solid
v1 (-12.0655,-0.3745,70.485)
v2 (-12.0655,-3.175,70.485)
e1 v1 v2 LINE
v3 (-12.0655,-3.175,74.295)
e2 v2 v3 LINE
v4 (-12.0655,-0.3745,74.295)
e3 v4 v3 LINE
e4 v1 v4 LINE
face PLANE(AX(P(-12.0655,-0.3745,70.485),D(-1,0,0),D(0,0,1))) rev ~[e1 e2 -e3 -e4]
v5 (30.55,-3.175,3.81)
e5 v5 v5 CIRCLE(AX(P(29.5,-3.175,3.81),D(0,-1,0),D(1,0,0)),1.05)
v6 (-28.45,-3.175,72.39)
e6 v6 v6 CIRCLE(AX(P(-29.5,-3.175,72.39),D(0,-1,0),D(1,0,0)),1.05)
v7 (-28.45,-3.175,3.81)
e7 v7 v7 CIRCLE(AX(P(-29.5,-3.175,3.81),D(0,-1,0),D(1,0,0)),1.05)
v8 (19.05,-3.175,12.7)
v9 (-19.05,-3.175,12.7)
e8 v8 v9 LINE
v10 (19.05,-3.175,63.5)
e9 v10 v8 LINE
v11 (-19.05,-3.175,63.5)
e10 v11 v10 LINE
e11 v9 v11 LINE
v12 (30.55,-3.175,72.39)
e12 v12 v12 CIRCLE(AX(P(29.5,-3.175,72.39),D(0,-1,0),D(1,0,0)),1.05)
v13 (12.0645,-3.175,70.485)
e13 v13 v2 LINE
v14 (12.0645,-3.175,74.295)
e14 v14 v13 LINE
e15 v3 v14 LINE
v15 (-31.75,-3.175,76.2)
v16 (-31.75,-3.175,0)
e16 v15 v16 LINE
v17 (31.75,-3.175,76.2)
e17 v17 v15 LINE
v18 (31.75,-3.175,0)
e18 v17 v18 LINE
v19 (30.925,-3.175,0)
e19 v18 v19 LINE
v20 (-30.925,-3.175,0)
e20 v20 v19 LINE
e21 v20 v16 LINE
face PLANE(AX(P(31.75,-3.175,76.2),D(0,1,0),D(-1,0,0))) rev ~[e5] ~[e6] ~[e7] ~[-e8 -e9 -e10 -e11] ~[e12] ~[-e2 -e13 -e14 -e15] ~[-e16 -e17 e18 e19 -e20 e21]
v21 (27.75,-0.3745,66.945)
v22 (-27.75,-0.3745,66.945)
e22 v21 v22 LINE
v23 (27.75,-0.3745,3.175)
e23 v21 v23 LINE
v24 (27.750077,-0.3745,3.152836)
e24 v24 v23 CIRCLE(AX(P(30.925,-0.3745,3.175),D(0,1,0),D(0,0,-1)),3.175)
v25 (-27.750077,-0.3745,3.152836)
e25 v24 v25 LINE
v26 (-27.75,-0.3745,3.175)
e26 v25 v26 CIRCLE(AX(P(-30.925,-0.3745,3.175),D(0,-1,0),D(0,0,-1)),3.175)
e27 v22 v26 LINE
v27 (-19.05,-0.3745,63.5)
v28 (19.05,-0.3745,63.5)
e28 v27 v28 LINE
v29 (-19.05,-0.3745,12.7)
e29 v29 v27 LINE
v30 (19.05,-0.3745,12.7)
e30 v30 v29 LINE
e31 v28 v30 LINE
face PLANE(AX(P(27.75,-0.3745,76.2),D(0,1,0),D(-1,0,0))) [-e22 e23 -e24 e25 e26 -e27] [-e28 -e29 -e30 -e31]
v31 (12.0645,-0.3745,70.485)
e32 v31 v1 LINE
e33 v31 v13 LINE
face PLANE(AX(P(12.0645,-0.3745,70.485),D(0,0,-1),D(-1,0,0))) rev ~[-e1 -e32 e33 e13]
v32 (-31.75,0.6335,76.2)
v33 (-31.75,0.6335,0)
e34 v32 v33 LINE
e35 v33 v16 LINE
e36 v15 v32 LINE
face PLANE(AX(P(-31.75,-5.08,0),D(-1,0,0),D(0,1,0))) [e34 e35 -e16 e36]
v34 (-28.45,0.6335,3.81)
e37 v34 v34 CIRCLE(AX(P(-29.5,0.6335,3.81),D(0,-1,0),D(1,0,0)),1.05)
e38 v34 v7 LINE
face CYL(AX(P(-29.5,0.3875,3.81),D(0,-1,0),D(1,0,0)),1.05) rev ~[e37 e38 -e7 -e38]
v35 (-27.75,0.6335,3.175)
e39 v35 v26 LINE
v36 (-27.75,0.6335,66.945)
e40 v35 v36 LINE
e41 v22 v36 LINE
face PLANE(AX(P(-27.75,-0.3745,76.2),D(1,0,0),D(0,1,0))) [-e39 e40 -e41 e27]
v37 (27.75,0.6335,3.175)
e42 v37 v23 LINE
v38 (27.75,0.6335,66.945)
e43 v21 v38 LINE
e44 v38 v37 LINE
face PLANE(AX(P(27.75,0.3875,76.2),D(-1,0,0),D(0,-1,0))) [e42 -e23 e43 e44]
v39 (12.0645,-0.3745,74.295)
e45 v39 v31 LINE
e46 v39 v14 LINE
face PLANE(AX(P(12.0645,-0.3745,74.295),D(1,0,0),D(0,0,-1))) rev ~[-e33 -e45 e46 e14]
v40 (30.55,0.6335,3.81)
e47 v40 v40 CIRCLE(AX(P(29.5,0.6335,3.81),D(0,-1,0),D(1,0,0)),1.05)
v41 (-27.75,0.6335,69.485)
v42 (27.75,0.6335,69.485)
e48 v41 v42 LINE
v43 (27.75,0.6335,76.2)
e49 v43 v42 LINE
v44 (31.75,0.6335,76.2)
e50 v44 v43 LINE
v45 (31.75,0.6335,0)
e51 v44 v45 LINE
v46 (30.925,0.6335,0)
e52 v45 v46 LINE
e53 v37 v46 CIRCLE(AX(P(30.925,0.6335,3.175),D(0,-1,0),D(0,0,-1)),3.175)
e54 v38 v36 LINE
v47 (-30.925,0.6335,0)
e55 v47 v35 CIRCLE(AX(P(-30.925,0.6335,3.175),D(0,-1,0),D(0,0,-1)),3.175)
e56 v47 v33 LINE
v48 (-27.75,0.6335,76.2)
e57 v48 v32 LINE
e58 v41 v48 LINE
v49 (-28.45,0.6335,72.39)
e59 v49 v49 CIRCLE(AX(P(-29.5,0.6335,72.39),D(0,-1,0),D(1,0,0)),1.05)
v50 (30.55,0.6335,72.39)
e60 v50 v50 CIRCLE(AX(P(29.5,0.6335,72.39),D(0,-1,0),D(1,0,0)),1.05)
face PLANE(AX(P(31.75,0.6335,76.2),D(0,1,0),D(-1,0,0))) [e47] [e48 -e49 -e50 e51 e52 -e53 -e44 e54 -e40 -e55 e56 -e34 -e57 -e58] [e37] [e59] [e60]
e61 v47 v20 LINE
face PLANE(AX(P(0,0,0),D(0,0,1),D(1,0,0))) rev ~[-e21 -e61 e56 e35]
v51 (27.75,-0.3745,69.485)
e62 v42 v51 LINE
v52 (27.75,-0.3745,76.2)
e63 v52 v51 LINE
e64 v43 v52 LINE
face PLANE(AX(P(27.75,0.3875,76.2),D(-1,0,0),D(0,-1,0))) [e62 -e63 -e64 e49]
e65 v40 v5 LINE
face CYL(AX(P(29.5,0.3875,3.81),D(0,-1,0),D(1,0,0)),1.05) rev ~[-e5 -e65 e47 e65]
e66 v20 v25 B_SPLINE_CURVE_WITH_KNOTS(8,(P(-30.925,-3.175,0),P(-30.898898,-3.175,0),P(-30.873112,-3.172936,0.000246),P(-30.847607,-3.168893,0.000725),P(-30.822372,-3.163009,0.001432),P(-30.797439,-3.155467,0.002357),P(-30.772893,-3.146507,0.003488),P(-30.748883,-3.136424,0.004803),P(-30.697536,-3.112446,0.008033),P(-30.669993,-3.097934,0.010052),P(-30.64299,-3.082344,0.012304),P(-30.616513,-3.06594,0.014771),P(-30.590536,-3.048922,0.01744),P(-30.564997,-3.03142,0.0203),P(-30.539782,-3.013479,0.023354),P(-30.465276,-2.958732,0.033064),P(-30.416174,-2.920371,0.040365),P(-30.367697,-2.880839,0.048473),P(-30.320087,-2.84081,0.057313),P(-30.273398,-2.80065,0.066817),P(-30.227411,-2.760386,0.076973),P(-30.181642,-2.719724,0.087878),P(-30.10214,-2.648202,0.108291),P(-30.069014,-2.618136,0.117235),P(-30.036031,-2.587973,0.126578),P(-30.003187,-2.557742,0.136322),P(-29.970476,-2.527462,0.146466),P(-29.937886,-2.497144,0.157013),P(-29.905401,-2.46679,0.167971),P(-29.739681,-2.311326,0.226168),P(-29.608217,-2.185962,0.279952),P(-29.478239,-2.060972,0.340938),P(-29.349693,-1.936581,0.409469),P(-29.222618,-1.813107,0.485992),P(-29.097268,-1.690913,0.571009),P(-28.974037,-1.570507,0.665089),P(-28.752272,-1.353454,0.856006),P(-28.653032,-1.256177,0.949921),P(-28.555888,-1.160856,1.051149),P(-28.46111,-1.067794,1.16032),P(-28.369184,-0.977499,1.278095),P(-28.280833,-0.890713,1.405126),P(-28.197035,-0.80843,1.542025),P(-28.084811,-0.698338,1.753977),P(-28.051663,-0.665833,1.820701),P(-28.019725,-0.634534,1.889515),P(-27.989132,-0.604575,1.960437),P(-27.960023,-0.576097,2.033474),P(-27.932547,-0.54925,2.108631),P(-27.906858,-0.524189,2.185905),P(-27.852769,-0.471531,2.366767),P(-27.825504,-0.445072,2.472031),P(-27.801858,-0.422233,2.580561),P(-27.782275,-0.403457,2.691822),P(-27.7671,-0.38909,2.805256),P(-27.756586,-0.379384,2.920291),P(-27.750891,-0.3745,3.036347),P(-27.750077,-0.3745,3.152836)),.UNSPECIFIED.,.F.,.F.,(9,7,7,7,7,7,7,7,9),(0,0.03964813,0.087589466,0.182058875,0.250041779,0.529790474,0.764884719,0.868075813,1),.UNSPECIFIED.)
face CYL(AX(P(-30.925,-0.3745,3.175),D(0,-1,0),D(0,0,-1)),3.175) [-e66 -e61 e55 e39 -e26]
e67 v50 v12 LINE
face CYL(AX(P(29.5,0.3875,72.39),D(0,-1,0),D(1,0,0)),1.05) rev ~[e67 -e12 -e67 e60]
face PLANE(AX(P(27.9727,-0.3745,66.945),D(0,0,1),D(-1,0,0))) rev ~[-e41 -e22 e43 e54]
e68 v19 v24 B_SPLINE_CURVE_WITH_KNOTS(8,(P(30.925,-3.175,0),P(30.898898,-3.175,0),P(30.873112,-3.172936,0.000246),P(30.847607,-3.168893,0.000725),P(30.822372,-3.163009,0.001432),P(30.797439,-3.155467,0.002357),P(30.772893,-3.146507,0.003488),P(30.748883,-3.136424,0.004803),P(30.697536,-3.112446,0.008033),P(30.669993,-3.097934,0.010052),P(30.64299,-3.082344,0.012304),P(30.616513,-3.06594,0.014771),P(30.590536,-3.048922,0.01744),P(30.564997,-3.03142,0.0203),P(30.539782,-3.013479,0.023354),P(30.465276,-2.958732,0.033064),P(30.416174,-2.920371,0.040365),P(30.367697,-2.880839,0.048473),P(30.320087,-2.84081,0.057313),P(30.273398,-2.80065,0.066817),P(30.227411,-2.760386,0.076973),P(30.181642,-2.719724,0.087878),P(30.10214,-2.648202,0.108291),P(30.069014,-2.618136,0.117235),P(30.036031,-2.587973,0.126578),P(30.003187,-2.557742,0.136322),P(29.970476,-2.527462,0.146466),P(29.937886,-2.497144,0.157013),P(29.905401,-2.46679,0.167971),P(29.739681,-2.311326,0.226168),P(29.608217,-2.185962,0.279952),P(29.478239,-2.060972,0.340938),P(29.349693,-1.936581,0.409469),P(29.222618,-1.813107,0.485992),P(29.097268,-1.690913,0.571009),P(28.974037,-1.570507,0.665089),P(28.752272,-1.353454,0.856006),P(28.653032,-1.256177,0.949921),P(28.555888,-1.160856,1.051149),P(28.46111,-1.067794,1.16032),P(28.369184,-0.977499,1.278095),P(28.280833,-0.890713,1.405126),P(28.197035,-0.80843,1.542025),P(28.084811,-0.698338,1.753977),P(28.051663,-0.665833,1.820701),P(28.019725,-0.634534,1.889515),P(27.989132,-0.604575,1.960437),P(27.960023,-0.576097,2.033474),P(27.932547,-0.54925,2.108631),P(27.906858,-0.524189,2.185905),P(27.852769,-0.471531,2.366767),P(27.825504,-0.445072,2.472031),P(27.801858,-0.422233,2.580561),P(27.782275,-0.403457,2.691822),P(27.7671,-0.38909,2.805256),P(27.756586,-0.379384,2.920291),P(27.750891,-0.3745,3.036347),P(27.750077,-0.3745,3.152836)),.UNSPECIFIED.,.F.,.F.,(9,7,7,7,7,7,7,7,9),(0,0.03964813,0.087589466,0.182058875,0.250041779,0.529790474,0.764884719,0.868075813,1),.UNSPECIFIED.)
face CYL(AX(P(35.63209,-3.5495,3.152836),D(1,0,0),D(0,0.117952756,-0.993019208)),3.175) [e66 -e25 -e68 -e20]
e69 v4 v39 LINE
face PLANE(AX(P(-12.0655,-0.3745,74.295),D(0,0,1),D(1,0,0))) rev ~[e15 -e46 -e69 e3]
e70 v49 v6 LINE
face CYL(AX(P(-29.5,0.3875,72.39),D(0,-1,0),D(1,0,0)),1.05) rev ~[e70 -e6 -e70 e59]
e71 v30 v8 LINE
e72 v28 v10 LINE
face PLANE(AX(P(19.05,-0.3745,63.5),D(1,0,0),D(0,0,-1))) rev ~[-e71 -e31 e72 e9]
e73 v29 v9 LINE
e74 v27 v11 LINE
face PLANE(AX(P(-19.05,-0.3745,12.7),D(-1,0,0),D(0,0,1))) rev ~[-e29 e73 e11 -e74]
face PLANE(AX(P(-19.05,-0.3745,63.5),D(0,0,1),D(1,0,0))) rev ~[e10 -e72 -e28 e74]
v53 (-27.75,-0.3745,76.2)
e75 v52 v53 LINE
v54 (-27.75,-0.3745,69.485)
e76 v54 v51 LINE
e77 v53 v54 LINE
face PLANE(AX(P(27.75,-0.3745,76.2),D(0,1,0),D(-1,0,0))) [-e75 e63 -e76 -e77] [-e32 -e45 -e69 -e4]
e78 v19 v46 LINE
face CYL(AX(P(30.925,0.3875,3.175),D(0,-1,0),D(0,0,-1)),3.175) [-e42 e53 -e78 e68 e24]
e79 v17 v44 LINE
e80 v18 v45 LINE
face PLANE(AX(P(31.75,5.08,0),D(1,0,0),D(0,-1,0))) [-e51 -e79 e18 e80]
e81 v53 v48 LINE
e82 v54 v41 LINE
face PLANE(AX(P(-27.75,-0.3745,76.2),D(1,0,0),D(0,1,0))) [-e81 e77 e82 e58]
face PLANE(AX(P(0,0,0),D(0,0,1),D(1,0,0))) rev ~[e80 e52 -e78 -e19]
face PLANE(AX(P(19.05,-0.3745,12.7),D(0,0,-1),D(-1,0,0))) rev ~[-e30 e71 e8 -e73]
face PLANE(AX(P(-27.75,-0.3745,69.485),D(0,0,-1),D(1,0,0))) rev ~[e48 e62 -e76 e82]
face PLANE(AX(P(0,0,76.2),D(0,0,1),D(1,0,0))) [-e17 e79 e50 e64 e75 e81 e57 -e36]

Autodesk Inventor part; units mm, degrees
ref_plane "YZ Plane" through (0, 0, 0) normal (1, 0, 0) x (0, 1, 0)
ref_plane "XZ Plane" through (0, 0, 0) normal (0, 1, 0) x (-1, 0, 0)
ref_plane "XY Plane" through (0, 0, 0) normal (0, 0, 1) x (1, 0, 0)
sketch "Sketch1" plane through (0, 0, 0) normal (0, 0, 1) x (1, 0, 0)
  line L0 (-31.75, 5.08) -> (31.75, 5.08)
  line L1 (31.75, 5.08) -> (31.75, -5.08)
  line L2 (31.75, -5.08) -> (-31.75, -5.08)
  line L3 (-31.75, -5.08) -> (-31.75, 5.08)
  point P0 (0, 0)
  dimension "d0" = 63.5
  dimension "d3" = 31.75
  dimension "d4" = 10.16
  dimension "d17" = 5.08
extrude "Extrusion1" add sketch "Sketch1" along normal blind 76.2
sketch "Sketch3" plane through (0, 0, 76.2) normal (0, 0, 1) x (1, 0, 0)
  line L0 (-27.75, 0.3875) -> (27.75, 0.3875)
  line L1 (27.75, 0.3875) -> (27.75, -0.3745)
  line L2 (27.75, -0.3745) -> (-27.75, -0.3745)
  line L3 (-27.75, -0.3745) -> (-27.75, 0.3875)
  line L4 (-31.75, 5.08) -> (-31.75, -5.08) projected
  point P0 (0, 0)
  point P1 (-27.75, 0.0065)
  dimension "d6" = 0.762
  dimension "d7" = 55.5
  dimension "d8" = 4
extrude "Extrusion2" cut sketch "Sketch3" against normal blind 85.1
sketch "Sketch8" plane through (0, 0, 76.2) normal (0, 0, 1) x (1, 0, 0)
  line L0 (27.75, 0.3875) -> (27.75, -0.3745) projected
  line L1 (27.75, -0.3745) -> (-27.75, -0.3745) projected
  line L2 (-27.75, -0.3745) -> (-27.75, 0.3875) projected
  line L3 (-27.75, 0.3875) -> (27.75, 0.3875) projected
  line L4 (-31.75, -5.08) -> (31.75, -5.08) projected
  line L5 (31.75, -5.08) -> (31.75, 5.08) projected
  line L6 (31.75, 5.08) -> (-31.75, 5.08) projected
  line L7 (-31.75, 5.08) -> (-31.75, -5.08) projected
  line L8 (-31.75, 5.08) -> (31.75, 5.08)
  line L9 (31.75, 5.08) -> (31.75, 0.3875)
  line L10 (31.75, 0.3875) -> (-31.75, 0.3875)
  line L11 (-31.75, 0.3875) -> (-31.75, 5.08)
  point P0 (0, 0)
  point P1 (-31.75, 0.3875)
  dimension "d30" = 0
extrude "Extrusion6" cut sketch "Sketch8" against normal blind 76.2 contours L3 L10 L7 L6 L5
sketch "Sketch9" plane through (0, 0, 76.2) normal (0, 0, 1) x (1, 0, 0)
  line L0 (-31.75, 0.3875) -> (-31.75, -5.08) projected
  line L1 (31.75, -5.08) -> (31.75, 0.3875) projected
  line L2 (-31.75, -5.08) -> (31.75, -5.08)
  line L3 (31.75, -5.08) -> (31.75, -3.175)
  line L4 (31.75, -3.175) -> (-31.75, -3.175)
  line L5 (-31.75, -3.175) -> (-31.75, -5.08)
  point P0 (0, 0)
  dimension "d33" = 1.905
extrude "Extrusion7" cut sketch "Sketch9" against normal blind 76.2
sketch "Sketch10" plane through (-27.75, -0.3745, 76.2) normal (0, 1, 0) x (1, 0, 0)
  line L0 (59.5, 76.2) -> (-4, 76.2) projected
  line L1 (-4, 76.2) -> (59.5, 76.2)
  line L2 (59.5, 76.2) -> (59.5, 0)
  line L3 (59.5, 0) -> (-4, 0)
  line L4 (-4, 0) -> (-4, 76.2)
  line L5 (8.7, 12.7) -> (46.8, 12.7)
  line L6 (46.8, 12.7) -> (46.8, 63.5)
  line L7 (46.8, 63.5) -> (8.7, 63.5)
  line L8 (8.7, 63.5) -> (8.7, 12.7)
  dimension "d46" = 12.7
extrude "Extrusion8" cut sketch "Sketch10" against normal blind 25.4 contours L8 L7 L6 L5
fillet "Fillet3" radius 3.175 3 edges at (0, -0.3745, 0) (-27.75, 0.0065, 0) (27.75, 0.0065, 0)
sketch "Sketch11" plane through (-27.75, -0.3745, 76.2) normal (0, 1, 0) x (1, 0, 0)
  line L0 (15.6845, 1.905) -> (39.8145, 1.905)
  line L1 (39.8145, 1.905) -> (39.8145, 5.715)
  line L2 (39.8145, 5.715) -> (15.6845, 5.715)
  line L3 (15.6845, 5.715) -> (15.6845, 1.905)
  line L4 (55.5, 0) -> (0, 0) projected
  line L5 (0, 0) -> (0, 73.025) projected
  line L6 (-4, 0) -> (-4, 76.2) projected
  point P0 (27.75, 76.2)
  dimension "d47" = 1.905
  dimension "d48" = 3.81
  dimension "d51" = 24.13
  dimension "d52" = 15.6845
  dimension "d67" = 19.6845
extrude "Extrusion9" cut sketch "Sketch11" against normal blind 25.4
sketch "Sketch13" plane through (-31.75, -3.175, 76.2) normal (0, -1, 0) x (1, 0, 0)
  circle A0 centre (61.25, -3.81) radius 1.05
  line L0 (63.5, 0) -> (59, 0)
  circle A1 centre (2.25, -3.81) radius 1.05
  line L1 (4.5, 0) -> (0, 0)
  circle A2 centre (61.25, -72.39) radius 1.05
  line L2 (59, -76.2) -> (63.5, -76.2)
  line L3 (59, 0) -> (59, -76.2)
  circle A3 centre (2.25, -72.39) radius 1.05
  line L4 (0, 0) -> (0, -76.2)
  line L5 (0, -76.2) -> (4.5, -76.2)
  line L6 (50.8, -12.7) -> (50.8, -63.5)
  line L7 (50.8, -63.5) -> (12.7, -63.5)
  line L8 (12.7, -63.5) -> (12.7, -12.7)
  line L9 (12.7, -12.7) -> (50.8, -12.7)
  line L10 (63.5, 0) -> (0, 0)
  line L11 (0, 0) -> (0, -76.2)
  line L12 (63.5, -76.2) -> (0, -76.2)
  line L13 (63.5, 0) -> (63.5, -76.2)
  point P0 (31.75, -76.2)
  point P1 (31.75, -76.2)
  dimension "d53" = 2.1
  dimension "d54" = 3.81
  dimension "d55" = 2.25
  dimension "d56" = 2.25
  dimension "d57" = 2.1
  dimension "d58" = 3.81
  dimension "d59" = 2.1
  dimension "d60" = 2.1
  dimension "d61" = 3.81
  dimension "d62" = 3.81
  dimension "d63" = 2.25
  dimension "d64" = 2.25
extrude "Extrusion10" cut sketch "Sketch13" against normal blind 25.4 contours A0 | A1 | A2 | A3
sketch "Sketch14" plane through (-31.75, 0.3875, 76.2) normal (0, 1, 0) x (1, 0, 0)
  circle A0 centre (2.25, 3.81) radius 1.05 projected
  circle A1 centre (2.25, 72.39) radius 1.05 projected
  arc A2 (4, 73.025) -> (0.825, 76.2) centre (0.825, 73.025) ccw projected
  line L0 (0, 76.2) -> (0.825, 76.2) projected
  line L1 (0, 0) -> (0, 76.2) projected
  line L2 (4, 0) -> (0, 0) projected
  line L3 (4, 0) -> (4, 73.025) projected
  circle A3 centre (61.25, 3.81) radius 1.05 projected
  circle A4 centre (61.25, 72.39) radius 1.05 projected
  arc A5 (62.675, 76.2) -> (59.5, 73.025) centre (62.675, 73.025) ccw projected
  line L4 (59.5, 0) -> (59.5, 73.025) projected
  line L5 (63.5, 0) -> (59.5, 0) projected
  line L6 (63.5, 76.2) -> (63.5, 0) projected
  line L7 (62.675, 76.2) -> (63.5, 76.2) projected
  point P0 (31.75, 76.2)
extrude "Extrusion11" add sketch "Sketch14" along normal blind 0.5
sketch "Sketch15" plane through (-27.75, -0.3745, 76.2) normal (0, 1, 0) x (1, 0, 0)
  line L0 (0, 0) -> (0, 73.025) projected
  line L1 (0, 6.715) -> (55.7227, 6.715)
  line L2 (55.7227, 6.715) -> (55.7227, 9.255)
  line L3 (55.7227, 9.255) -> (0, 9.255)
  line L4 (0, 9.255) -> (0, 6.715)
  line L5 (15.6845, 5.715) -> (39.8145, 5.715) projected
  point P0 (27.75, 76.2)
  point P1 (0, 9.255)
  dimension "d72" = 2.54
  dimension "d77" = 1
extrude "Extrusion12" add sketch "Sketch15" along normal blind 1.3
sketch "Sketch16" plane through (0, 0, 76.2) normal (0, 0, 1) x (1, 0, 0)
  line L0 (31.75, -3.175) -> (31.75, 0.8875) projected
  line L1 (-36.1102, 11.8694) -> (32.0392, 11.8694)
  line L2 (32.0392, 11.8694) -> (32.0392, 0.6335)
  line L3 (32.0392, 0.6335) -> (-36.1102, 0.6335)
  line L4 (-36.1102, 0.6335) -> (-36.1102, 11.8694)
  line L5 (-31.75, 0.8875) -> (-27.75, 0.8875) projected
  point P0 (0, 0)
  dimension "d79" = 0.254
extrude "Extrusion13" cut sketch "Sketch16" against normal blind 254
sketch "Sketch18" plane through (0, 0, 0) normal (0, 0, -1) x (-1, 0, 0)
  line L0 (27.7501, -0.3745) -> (-27.7501, -0.3745) projected
  line L1 (27.75, 0.6335) -> (-27.75, 0.6335) projected
  point P0 (0, 0)
  dimension "d78" = 1.008
properties part number "Scanner_Test_Bot"
